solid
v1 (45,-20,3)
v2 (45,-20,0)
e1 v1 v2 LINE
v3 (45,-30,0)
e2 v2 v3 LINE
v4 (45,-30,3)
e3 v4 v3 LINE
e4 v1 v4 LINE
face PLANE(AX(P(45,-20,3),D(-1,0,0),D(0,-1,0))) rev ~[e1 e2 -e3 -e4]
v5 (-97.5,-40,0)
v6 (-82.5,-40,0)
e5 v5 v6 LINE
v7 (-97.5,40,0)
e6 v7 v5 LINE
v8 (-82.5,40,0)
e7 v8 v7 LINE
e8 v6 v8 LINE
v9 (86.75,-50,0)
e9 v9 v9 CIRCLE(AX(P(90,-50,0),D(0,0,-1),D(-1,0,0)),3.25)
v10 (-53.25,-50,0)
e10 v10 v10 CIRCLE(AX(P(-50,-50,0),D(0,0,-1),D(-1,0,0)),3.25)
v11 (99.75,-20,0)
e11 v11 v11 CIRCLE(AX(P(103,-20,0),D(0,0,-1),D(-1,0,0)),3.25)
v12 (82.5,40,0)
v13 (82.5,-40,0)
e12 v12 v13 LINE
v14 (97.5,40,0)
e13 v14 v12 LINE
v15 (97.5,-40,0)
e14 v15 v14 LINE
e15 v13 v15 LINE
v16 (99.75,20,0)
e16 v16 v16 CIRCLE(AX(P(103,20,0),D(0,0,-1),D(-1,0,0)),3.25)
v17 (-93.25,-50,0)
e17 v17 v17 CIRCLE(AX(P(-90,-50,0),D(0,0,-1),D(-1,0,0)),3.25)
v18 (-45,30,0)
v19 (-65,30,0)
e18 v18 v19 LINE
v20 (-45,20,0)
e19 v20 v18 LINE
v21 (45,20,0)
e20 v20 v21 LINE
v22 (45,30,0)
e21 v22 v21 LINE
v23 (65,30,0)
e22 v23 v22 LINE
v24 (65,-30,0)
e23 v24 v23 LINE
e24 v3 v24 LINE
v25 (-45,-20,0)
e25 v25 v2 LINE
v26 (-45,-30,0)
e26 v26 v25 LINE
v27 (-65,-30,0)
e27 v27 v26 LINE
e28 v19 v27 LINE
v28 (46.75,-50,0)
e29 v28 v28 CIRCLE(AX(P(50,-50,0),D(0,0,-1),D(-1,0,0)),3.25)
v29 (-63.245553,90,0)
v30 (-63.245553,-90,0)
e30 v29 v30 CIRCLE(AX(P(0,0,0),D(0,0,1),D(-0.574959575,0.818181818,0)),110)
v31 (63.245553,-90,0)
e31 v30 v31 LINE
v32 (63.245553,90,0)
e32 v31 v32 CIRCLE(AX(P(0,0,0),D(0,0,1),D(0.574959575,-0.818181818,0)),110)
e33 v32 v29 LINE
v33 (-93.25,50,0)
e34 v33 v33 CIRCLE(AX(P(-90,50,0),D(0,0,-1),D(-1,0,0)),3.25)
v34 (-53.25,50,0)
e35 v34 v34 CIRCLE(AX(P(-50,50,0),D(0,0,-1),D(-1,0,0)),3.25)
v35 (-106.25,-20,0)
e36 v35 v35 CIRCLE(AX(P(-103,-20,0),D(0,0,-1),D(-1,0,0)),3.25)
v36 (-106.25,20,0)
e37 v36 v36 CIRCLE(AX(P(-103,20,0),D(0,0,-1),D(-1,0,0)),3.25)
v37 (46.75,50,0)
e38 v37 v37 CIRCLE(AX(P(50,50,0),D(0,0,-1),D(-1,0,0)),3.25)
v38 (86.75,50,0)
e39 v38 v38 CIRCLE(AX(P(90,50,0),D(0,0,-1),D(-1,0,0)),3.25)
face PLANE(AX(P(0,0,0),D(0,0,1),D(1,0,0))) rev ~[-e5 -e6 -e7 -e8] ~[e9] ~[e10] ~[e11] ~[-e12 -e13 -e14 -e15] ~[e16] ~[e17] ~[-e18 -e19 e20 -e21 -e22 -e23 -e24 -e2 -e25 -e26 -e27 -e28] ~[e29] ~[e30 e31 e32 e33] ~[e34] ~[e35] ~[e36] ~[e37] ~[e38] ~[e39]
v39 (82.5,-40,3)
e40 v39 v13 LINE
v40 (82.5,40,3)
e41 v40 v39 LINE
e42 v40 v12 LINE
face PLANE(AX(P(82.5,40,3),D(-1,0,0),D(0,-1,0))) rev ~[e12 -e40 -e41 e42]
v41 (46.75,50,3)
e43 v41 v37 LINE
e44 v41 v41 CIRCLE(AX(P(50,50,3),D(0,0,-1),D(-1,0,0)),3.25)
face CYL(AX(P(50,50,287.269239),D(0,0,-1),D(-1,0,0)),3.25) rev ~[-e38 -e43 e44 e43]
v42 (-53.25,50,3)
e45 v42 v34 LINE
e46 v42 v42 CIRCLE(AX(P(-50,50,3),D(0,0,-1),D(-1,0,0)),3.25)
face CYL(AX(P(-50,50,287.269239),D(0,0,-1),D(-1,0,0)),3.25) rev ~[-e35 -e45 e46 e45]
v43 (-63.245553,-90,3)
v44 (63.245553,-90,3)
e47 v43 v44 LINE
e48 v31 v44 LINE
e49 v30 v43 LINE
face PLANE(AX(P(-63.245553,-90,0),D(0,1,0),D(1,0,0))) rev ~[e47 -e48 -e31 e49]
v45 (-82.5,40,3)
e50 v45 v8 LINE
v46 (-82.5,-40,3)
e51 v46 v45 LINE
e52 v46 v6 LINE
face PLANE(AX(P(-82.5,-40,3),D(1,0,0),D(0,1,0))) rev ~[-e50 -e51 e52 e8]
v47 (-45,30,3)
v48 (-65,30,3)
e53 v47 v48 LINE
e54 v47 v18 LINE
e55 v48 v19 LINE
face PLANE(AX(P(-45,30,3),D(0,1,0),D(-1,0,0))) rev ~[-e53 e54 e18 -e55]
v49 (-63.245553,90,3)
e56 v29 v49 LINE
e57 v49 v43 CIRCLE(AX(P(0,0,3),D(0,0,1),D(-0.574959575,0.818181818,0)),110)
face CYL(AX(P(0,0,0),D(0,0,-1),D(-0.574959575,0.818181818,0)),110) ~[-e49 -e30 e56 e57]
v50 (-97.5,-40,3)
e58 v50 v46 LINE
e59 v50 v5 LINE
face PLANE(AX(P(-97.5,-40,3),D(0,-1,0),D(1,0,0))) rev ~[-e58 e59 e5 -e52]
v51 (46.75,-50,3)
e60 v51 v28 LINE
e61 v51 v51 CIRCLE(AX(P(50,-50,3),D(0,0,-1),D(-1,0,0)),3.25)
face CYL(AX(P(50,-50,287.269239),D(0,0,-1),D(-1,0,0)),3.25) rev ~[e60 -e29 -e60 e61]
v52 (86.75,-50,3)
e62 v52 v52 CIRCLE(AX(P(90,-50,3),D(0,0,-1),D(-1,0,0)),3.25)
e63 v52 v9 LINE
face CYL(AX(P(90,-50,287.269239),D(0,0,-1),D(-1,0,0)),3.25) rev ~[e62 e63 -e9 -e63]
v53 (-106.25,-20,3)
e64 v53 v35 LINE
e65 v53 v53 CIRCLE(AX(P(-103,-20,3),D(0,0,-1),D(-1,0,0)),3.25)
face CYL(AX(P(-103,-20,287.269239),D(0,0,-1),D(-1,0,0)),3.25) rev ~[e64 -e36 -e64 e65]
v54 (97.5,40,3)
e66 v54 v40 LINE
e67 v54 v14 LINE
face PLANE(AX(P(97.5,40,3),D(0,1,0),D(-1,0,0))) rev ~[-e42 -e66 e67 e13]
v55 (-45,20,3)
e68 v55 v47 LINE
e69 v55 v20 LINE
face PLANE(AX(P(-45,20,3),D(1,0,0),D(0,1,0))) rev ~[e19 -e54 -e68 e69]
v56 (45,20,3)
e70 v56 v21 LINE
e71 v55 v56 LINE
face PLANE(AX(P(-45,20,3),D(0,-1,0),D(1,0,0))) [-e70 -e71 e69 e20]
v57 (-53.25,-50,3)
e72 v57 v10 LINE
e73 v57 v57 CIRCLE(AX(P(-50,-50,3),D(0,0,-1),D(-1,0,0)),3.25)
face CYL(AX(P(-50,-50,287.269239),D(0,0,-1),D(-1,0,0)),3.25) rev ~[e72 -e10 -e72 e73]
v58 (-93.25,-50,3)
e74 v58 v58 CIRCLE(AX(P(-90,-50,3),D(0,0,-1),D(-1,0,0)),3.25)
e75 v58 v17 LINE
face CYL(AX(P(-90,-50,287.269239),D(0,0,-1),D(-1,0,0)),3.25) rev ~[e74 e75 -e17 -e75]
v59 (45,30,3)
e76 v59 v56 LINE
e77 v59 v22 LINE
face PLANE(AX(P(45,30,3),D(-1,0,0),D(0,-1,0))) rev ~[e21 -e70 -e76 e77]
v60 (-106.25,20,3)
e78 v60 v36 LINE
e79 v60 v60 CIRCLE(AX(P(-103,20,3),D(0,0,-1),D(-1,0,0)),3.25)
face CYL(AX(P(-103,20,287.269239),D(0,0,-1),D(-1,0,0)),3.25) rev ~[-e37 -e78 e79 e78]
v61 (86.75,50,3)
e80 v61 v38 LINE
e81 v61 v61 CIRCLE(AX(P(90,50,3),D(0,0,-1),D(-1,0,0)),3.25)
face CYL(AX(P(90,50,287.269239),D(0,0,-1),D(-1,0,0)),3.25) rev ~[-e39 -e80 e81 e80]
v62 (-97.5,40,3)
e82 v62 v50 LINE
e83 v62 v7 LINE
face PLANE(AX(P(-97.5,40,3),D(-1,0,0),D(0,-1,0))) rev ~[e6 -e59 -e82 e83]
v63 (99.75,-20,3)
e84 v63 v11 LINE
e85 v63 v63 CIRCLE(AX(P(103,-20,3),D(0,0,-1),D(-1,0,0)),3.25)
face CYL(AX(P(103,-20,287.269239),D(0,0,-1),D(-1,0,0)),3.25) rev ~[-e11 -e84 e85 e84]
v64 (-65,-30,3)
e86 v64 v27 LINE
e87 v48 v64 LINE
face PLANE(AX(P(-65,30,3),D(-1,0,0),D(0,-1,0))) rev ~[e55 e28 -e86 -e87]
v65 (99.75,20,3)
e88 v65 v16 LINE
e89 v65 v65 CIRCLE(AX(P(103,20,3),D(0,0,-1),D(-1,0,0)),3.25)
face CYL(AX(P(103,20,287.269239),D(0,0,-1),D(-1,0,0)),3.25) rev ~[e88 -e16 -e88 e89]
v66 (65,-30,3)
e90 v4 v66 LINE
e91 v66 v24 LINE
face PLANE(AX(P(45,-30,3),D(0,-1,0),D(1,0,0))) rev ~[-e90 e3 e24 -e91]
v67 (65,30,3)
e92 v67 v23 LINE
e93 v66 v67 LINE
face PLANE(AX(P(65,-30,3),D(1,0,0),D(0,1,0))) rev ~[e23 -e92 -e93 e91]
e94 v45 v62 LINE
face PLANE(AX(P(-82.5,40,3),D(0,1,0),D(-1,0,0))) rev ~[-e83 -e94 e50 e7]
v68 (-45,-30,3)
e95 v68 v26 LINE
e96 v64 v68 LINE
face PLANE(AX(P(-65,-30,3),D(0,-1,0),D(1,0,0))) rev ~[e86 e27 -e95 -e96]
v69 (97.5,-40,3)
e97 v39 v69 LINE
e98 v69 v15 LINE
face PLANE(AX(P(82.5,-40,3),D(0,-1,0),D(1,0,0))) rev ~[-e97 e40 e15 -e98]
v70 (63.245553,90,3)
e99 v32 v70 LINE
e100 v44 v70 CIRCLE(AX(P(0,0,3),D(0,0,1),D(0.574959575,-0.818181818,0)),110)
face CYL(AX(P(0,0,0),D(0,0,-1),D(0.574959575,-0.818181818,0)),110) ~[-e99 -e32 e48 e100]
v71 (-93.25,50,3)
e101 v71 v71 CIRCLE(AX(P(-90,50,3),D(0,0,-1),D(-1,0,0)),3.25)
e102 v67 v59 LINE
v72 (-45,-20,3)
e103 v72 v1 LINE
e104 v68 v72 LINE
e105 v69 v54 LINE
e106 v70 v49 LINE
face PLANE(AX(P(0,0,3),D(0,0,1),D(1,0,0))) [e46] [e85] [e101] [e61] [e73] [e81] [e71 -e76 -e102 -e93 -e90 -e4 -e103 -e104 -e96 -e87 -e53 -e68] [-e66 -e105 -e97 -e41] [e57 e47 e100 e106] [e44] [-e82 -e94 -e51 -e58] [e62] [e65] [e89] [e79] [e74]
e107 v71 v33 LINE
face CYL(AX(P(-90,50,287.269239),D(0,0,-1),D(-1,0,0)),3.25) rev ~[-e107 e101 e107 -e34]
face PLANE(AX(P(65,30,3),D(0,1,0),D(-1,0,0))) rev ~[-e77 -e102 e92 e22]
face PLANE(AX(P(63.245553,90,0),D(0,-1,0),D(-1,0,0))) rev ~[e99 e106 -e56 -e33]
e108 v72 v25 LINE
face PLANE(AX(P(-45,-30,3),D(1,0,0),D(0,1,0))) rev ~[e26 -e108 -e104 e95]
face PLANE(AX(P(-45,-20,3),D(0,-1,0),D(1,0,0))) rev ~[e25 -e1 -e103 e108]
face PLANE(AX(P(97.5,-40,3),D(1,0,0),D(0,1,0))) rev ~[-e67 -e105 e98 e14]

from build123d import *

# Parameters (mm, degrees)
F1_DEPTH = 3
F3_D     = 6.5
F5_D     = 6.5
F6_W     = 90
F6_H     = 40
F7_DEPTH = 3.001
F9_DEPTH = 3.001


# Not quite as in the source:
# - a feature names something its author has since deleted; it is built from what else it names


with BuildPart() as f1:
    # F0 (on Top) → F1 (new body)
    with BuildSketch(Plane.XY):
        with BuildLine():
            Line((63.2455532034, 90), (-63.2455532034, 90))
            ThreePointArc((-63.2455532034, 90), (-110, 0), (-63.2455532034, -90))
            Line((-63.2455532034, -90), (63.2455532034, -90))
            ThreePointArc((63.2455532034, -90), (110, 0), (63.2455532034, 90))
        make_face()
    extrude(amount=F1_DEPTH)

    # F3 (through all)
    with Locations(Plane.XY.offset(3)):
        with Locations((-103, 20), (-103, -20), (-90, 50), (-90, -50), (90, -50), (90, 50), (103, 20), (103, -20)):
            Hole(F3_D / 2)

    # F5 (through all)
    with Locations(Plane.XY.offset(3)):
        with Locations((-50, 50), (50, 50), (50, -50), (-50, -50)):
            Hole(F5_D / 2)

    # F6 (on face) → F7 (cut, through all)
    with BuildSketch(Plane.XY.offset(3)):
        Polygon((-45, -20), (-45, 20), (-45, 30), (-65, 30), (-65, -30), (-45, -30), align=None)
        Rectangle(F6_W, F6_H)
        Polygon((45, 30), (45, 20), (45, -20), (45, -30), (65, -30), (65, 30), align=None)
    extrude(amount=-F7_DEPTH, mode=Mode.SUBTRACT)

    # F8 (on face) → F9 (cut, through all)
    with BuildSketch(Plane.XY.offset(3)):
        Polygon((-90, 40), (-97.5, 40), (-97.5, -40), (-82.5, -40), (-82.5, 40), align=None)
        Polygon((90, 40), (82.5, 40), (82.5, -40), (97.5, -40), (97.5, 40), align=None)
    extrude(amount=-F9_DEPTH, mode=Mode.SUBTRACT)


solid = f1.part
